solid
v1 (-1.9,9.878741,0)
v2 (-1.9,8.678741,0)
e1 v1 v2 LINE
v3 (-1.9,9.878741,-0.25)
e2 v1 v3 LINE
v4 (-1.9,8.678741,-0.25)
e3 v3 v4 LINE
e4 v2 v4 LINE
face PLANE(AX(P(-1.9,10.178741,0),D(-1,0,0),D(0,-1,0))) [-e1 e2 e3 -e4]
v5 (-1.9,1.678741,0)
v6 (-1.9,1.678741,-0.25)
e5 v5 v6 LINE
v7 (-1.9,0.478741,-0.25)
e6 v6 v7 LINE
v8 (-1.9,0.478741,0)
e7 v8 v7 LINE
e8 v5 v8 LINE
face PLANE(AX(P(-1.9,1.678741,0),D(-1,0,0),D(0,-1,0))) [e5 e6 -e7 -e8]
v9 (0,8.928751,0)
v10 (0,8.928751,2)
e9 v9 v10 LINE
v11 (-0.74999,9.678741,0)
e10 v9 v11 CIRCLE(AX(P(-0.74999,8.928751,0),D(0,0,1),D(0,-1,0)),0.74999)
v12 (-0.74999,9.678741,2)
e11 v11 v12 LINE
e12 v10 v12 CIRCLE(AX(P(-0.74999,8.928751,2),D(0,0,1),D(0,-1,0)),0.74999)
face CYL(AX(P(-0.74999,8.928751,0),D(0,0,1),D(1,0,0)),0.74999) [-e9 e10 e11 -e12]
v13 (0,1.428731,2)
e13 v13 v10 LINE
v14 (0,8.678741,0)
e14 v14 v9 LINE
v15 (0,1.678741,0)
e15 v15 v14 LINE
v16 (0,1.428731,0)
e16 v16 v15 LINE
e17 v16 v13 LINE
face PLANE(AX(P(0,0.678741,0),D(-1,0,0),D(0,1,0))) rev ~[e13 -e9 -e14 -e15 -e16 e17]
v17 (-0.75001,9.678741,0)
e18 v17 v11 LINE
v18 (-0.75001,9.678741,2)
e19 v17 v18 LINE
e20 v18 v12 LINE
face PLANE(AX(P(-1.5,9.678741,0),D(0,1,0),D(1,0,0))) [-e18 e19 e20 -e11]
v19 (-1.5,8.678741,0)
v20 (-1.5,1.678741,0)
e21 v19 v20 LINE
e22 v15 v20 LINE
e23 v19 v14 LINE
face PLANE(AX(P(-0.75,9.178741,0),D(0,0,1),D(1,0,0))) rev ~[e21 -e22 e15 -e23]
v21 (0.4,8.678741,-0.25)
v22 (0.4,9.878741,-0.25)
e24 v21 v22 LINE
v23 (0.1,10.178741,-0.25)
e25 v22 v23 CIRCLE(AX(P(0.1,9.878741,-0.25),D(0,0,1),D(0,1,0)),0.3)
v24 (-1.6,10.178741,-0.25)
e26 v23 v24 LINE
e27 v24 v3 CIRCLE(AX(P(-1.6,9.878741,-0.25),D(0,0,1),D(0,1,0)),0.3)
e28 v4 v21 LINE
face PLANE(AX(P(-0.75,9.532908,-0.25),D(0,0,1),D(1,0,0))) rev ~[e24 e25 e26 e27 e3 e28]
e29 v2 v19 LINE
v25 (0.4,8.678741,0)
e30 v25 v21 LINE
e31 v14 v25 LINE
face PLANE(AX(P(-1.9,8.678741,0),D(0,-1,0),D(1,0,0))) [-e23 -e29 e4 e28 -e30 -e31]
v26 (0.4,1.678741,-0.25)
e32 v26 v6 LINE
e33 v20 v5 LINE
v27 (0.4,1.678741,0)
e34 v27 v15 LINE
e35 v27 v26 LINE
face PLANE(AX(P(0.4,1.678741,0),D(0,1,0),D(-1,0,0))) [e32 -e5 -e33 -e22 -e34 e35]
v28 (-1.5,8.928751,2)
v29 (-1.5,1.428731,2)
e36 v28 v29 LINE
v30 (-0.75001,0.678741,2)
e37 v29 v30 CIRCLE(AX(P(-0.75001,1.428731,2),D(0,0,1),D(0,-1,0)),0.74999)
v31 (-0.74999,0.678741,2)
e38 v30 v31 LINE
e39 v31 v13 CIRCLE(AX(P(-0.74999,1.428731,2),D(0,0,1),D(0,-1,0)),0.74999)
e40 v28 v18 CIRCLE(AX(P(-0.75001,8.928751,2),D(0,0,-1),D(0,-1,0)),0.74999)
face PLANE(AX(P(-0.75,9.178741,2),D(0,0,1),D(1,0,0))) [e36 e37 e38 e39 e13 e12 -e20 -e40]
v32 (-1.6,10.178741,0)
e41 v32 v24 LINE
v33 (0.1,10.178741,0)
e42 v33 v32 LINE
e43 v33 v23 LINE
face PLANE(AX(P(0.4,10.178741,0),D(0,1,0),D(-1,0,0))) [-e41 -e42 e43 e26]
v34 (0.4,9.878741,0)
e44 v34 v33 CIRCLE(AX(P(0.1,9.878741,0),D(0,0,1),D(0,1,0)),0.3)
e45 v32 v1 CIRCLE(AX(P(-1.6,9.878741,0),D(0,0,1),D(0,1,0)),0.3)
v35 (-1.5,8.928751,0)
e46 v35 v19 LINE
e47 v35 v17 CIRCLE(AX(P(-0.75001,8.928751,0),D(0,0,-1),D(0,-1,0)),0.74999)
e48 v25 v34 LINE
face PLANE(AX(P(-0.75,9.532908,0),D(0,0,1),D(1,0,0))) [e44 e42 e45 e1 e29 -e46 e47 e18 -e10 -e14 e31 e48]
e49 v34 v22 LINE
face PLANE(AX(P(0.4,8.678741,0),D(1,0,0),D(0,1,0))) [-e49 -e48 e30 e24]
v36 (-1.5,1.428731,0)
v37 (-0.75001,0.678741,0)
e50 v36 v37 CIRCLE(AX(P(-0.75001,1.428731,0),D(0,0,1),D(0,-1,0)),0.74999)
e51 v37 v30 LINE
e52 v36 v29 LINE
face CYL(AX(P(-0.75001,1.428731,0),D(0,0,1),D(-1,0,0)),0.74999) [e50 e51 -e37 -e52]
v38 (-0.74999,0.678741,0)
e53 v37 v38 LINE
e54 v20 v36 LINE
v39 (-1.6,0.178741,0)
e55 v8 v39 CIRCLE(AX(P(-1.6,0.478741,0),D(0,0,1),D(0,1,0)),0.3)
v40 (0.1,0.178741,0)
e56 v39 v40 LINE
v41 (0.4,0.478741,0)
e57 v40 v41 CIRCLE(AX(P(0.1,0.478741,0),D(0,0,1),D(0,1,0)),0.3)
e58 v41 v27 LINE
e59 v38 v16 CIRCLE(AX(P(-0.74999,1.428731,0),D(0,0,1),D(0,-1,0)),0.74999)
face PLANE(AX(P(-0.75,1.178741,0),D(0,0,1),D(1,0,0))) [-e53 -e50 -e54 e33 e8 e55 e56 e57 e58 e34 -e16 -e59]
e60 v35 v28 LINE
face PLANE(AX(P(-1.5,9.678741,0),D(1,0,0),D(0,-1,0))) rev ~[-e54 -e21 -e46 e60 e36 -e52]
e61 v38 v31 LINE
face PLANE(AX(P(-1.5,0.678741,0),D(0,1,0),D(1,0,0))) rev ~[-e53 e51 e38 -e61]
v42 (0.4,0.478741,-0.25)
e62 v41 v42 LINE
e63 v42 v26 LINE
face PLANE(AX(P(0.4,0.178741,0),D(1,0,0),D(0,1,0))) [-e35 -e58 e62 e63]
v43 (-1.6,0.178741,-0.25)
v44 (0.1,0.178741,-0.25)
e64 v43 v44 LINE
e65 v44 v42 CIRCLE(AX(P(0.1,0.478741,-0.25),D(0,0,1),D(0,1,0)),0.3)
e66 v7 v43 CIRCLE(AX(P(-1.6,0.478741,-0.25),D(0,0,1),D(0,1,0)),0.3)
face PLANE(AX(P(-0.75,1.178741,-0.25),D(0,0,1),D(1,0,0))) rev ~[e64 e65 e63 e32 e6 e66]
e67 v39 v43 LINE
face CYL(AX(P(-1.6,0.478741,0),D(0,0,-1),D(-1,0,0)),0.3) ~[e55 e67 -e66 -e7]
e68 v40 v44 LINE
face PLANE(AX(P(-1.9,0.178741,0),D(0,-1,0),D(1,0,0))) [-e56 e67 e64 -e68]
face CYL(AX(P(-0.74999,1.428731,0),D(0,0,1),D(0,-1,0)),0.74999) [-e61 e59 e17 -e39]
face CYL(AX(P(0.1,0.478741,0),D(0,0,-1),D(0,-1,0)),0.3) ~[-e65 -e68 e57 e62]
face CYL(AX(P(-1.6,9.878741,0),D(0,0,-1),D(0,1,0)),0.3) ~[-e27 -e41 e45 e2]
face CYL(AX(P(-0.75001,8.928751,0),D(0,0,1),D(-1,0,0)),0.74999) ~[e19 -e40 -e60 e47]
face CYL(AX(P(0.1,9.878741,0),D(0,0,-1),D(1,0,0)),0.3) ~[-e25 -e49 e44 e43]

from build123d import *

# Parameters (mm, degrees)
F0_W     = 1.5
F0_H     = 1
F0_H_2   = 7
F1_DEPTH = 2
F2_DEPTH = 0.25
F3_R     = 0.74999
F4_R     = 0.3


# Not quite as in the source:
# - a fillet or chamfer is up to 0.001 mm smaller than in the source, because OpenCascade refuses the exact size
# - a feature names something its author has since deleted; it is built from what else it names


with BuildPart() as f1:
    # F0 (on Top) → F1 (new body)
    with BuildSketch(Plane.XY):
        with Locations((-0.75, 9.1787409857)):
            Rectangle(F0_W, F0_H)
        with Locations((-0.75, 5.1787409857)):
            Rectangle(F0_W, F0_H_2)
        with Locations((-0.75, 1.1787409857)):
            Rectangle(F0_W, F0_H)
    extrude(amount=F1_DEPTH)

    # F0 (on Top) → F2 (join)
    with BuildSketch(Plane.XY):
        with Locations((-0.75, 1.1787409857)):
            Rectangle(F0_W, F0_H)
        Polygon((-1.5, 0.6787409857), (-1.5, 1.6787409857), (-1.9, 1.6787409857), (-1.9, 0.1787409857), (0.4, 0.1787409857), (0.4, 1.6787409857), (0, 1.6787409857), (0, 0.6787409857), align=None)
        Polygon((-1.5, 8.6787409857), (-1.5, 9.6787409857), (0, 9.6787409857), (0, 8.6787409857), (0.4, 8.6787409857), (0.4, 10.1787409857), (-1.9, 10.1787409857), (-1.9, 8.6787409857), align=None)
        with Locations((-0.75, 9.1787409857)):
            Rectangle(F0_W, F0_H)
    extrude(amount=-F2_DEPTH)

    # F3 (radius 0.75 in the source; OpenCascade refuses exactly that, so slightly less here)
    f3_edges = [f1.edges().sort_by_distance(p)[0] for p in [
        (0, 9.678741, 1),
        (-1.5, 9.678741, 1),
        (0, 0.678741, 1),
        (-1.5, 0.678741, 1),
    ]]
    fillet(f3_edges, radius=F3_R)

    # F4
    f4_edges = [f1.edges().sort_by_distance(p)[0] for p in [
        (0.4, 10.178741, -0.125),
        (-1.9, 10.178741, -0.125),
        (0.4, 0.178741, -0.125),
        (-1.9, 0.178741, -0.125),
    ]]
    fillet(f4_edges, radius=F4_R)


solid = f1.part
